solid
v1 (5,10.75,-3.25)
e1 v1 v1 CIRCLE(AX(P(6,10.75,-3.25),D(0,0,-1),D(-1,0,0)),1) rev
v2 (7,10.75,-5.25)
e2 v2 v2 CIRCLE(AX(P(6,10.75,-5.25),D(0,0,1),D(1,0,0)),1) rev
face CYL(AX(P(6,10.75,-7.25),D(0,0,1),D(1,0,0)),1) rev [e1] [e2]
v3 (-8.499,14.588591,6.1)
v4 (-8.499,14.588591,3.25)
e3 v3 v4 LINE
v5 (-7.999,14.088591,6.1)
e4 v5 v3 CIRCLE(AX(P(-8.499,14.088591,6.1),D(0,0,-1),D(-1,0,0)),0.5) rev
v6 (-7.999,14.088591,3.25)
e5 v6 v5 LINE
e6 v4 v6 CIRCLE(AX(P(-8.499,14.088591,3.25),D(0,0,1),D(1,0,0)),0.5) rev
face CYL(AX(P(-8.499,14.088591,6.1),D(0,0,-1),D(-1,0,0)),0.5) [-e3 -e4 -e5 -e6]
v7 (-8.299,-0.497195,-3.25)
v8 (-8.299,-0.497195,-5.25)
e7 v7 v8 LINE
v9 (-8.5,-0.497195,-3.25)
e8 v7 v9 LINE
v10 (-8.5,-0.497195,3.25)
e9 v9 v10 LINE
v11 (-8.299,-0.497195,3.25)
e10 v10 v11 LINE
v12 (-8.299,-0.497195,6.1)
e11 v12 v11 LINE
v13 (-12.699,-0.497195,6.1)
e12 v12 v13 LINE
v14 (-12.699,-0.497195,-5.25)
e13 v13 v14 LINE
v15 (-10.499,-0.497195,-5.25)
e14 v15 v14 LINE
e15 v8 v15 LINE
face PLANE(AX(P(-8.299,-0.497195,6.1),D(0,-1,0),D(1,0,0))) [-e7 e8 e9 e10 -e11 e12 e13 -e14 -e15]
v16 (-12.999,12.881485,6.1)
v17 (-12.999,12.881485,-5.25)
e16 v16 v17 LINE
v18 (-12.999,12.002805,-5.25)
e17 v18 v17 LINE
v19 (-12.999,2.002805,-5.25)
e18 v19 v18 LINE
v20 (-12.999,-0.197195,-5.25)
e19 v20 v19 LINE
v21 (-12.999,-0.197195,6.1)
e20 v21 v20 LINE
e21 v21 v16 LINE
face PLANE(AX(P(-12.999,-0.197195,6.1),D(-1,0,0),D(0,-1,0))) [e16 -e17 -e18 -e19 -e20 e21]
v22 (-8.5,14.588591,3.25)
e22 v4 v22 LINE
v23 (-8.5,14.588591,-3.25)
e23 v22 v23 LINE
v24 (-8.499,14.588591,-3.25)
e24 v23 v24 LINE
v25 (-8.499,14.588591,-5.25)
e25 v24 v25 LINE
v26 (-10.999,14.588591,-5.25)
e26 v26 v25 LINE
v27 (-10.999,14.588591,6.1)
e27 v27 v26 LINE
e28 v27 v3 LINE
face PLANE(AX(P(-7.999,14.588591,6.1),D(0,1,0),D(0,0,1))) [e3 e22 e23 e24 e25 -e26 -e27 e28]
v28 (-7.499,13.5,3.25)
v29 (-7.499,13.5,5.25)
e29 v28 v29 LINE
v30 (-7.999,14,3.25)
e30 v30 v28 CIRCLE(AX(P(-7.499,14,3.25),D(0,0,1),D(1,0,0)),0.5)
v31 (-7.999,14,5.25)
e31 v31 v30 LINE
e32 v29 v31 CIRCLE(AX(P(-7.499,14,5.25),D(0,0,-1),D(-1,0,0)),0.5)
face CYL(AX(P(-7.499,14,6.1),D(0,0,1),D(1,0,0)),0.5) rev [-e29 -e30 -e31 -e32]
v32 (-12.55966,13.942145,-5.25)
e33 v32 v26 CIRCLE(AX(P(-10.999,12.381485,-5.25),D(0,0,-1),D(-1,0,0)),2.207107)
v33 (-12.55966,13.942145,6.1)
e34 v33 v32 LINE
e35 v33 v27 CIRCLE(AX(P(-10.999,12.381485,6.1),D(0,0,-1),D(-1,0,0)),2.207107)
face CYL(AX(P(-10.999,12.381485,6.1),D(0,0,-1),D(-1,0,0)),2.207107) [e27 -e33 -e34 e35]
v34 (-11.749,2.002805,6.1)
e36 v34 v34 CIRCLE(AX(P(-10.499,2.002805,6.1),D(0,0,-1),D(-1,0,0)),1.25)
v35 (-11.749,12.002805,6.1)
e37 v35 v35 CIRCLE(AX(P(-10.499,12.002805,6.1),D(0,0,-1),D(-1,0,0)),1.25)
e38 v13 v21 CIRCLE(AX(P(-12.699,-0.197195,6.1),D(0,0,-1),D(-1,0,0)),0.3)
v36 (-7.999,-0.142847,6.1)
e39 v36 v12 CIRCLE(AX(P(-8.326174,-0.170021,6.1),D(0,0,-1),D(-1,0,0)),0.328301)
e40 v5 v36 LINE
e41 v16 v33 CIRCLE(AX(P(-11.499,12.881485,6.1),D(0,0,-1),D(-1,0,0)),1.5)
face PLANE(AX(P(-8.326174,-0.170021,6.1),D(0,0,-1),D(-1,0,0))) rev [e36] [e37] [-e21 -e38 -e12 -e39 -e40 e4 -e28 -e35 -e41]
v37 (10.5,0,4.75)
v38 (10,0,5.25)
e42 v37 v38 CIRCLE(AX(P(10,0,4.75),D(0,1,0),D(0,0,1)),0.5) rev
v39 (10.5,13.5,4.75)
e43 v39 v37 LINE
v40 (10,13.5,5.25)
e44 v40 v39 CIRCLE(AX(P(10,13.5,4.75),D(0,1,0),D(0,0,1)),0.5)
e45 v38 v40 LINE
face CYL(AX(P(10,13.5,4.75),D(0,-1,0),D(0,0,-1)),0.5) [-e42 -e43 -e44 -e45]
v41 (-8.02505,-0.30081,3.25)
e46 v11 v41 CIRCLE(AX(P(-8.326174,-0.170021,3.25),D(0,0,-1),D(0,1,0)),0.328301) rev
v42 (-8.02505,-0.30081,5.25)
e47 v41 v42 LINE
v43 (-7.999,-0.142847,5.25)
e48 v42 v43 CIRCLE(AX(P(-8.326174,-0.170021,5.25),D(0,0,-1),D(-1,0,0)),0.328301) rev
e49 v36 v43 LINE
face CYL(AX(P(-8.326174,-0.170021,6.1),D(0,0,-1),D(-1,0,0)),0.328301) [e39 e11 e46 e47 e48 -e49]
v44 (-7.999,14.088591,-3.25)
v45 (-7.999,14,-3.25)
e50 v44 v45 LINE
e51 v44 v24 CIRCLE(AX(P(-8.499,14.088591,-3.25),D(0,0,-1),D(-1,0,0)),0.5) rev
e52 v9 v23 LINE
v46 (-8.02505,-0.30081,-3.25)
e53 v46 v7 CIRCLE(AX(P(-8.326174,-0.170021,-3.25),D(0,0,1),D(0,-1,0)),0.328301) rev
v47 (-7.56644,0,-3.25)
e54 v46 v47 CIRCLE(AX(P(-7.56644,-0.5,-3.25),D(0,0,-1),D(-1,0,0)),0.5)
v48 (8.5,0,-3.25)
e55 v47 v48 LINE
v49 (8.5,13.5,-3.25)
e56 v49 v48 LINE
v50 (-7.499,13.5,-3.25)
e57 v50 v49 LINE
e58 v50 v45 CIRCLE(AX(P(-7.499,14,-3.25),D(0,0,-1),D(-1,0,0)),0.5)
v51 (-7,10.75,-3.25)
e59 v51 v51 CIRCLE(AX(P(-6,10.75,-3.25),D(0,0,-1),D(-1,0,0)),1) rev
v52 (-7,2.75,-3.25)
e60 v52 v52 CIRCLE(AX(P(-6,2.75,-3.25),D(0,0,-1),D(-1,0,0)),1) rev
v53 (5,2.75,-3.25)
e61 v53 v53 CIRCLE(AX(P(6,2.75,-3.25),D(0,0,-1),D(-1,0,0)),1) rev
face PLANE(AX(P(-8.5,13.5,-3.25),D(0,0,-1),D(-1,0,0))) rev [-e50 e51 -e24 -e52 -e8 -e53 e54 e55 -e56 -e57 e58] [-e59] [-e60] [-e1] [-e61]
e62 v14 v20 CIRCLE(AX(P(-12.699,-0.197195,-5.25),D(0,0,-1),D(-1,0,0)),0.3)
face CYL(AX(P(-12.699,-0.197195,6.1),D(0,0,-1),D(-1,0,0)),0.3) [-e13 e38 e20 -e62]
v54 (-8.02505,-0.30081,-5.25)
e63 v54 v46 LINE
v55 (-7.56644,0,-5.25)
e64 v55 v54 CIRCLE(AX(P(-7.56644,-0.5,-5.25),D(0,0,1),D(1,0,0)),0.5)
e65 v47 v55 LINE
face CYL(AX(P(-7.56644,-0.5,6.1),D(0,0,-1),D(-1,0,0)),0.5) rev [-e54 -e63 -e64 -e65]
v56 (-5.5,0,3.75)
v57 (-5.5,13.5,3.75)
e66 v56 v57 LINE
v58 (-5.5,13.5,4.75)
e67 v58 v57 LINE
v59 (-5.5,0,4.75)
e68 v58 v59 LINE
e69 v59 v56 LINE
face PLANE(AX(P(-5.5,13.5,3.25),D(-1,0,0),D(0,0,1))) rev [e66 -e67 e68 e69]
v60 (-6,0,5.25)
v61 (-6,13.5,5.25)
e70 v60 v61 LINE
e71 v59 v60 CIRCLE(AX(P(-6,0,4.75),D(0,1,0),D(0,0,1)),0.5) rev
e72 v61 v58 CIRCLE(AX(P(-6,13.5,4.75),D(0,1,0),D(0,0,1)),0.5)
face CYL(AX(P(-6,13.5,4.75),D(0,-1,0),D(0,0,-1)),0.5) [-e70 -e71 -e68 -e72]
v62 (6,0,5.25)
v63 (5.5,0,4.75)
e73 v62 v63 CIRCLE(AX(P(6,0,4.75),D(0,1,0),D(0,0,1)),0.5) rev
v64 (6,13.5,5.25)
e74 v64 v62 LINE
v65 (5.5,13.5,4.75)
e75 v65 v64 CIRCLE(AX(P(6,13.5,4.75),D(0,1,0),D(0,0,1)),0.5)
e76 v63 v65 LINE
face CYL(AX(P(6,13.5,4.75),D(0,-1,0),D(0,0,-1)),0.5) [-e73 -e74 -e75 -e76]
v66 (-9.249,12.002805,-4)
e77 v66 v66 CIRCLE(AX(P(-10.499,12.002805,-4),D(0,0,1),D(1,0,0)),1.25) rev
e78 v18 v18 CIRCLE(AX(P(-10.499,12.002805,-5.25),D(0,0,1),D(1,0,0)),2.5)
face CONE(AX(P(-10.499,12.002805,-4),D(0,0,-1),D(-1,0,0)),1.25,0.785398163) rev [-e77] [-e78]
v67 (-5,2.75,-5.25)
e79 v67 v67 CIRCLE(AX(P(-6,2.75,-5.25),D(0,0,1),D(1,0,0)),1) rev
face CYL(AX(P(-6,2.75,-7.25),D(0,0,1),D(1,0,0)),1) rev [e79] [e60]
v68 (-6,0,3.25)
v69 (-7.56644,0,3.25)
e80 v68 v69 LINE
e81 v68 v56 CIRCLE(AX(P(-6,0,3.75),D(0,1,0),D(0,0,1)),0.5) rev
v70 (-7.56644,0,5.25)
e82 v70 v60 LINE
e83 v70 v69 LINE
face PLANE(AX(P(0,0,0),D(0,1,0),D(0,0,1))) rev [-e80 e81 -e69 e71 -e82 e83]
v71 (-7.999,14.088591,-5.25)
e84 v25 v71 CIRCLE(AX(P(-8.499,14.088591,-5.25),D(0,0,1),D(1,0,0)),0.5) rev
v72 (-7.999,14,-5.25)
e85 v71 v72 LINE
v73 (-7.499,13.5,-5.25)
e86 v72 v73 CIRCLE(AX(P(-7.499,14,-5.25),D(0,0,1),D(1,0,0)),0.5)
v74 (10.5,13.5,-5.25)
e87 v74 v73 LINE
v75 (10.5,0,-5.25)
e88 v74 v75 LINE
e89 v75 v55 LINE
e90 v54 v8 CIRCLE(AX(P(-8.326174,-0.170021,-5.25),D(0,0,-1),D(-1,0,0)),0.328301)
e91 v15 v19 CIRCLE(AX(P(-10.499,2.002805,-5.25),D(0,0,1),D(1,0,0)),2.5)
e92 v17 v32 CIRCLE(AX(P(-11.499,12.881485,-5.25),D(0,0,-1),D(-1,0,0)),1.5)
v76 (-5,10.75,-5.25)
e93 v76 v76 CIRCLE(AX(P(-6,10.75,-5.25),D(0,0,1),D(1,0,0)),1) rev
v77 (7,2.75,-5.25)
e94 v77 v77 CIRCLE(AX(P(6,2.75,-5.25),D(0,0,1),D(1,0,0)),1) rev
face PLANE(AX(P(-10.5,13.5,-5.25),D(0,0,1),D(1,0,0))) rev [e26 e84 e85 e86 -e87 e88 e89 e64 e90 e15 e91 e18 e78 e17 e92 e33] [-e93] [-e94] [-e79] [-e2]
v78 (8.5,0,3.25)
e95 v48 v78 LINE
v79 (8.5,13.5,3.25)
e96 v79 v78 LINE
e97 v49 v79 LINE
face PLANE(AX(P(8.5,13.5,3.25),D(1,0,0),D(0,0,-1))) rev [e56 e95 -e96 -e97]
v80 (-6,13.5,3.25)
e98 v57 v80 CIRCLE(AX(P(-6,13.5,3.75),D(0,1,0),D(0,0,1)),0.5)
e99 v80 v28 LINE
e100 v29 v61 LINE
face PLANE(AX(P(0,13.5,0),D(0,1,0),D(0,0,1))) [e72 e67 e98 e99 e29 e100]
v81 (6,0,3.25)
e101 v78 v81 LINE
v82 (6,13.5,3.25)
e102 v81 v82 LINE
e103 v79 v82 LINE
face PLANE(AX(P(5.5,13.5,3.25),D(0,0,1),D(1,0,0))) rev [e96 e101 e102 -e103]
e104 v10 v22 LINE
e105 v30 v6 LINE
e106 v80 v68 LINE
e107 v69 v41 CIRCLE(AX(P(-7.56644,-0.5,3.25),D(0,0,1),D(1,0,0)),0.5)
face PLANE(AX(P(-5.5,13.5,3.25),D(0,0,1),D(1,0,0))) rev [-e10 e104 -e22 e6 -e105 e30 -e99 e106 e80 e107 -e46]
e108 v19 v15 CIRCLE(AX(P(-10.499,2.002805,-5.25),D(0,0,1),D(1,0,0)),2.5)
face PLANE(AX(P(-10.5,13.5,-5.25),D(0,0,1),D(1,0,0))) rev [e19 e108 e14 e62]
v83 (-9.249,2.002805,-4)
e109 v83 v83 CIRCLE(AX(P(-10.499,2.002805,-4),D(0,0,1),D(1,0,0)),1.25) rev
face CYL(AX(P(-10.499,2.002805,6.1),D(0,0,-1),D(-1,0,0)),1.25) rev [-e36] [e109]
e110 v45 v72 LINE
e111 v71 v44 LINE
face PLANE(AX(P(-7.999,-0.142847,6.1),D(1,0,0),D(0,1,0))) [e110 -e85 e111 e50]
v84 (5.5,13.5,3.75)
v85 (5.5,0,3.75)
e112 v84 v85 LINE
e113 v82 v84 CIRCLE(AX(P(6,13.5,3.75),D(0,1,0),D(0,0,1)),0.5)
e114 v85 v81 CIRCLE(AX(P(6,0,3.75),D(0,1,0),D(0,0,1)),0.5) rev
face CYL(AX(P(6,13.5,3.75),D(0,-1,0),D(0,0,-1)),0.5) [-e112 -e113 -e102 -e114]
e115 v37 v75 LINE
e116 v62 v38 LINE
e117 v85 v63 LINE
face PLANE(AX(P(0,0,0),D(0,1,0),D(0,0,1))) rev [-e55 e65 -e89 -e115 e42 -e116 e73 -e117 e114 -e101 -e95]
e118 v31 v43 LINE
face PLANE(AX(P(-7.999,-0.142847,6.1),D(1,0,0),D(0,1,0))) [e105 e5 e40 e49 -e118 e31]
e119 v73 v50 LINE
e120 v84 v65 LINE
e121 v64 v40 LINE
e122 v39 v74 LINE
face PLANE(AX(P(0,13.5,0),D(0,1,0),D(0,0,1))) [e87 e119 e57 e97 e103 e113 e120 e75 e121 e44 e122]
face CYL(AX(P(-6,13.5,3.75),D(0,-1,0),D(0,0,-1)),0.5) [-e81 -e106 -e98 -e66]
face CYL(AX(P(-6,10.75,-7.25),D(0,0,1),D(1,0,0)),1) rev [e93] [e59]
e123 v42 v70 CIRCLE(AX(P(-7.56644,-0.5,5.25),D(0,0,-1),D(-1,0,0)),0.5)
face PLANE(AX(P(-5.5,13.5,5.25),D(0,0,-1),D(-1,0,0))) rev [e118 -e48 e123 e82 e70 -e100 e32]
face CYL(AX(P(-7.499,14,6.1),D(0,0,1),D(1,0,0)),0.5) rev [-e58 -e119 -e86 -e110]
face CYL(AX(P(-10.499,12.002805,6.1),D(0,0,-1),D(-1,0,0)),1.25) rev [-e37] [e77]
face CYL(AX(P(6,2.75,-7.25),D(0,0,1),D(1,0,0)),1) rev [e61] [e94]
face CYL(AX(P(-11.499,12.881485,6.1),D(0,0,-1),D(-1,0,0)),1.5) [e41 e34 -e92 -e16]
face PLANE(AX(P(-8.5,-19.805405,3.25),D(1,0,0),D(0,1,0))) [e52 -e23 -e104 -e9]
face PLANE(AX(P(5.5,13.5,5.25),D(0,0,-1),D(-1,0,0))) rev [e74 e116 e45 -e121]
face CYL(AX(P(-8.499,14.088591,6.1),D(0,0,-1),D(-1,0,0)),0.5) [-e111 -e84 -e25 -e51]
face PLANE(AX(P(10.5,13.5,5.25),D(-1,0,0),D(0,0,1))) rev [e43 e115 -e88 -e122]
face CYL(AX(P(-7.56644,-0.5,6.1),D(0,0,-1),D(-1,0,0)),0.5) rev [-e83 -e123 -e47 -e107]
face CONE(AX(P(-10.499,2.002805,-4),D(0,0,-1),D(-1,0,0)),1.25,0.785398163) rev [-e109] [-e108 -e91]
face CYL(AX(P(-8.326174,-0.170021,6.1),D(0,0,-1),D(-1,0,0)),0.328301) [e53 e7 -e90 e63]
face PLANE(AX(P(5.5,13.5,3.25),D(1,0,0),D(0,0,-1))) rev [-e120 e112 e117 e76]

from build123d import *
from OCP.BRepAlgoAPI import BRepAlgoAPI_Cut
from OCP.TopTools import TopTools_ListOfShape

# Parameters (mm, degrees)
EXTRUDE_1_DEPTH          = 13.5
FILLET_1_R               = 0.5
CUT_EXTRUDE_1_DEPTH      = 2
CUT_EXTRUDE_1_DEPTH_BACK = 3.5
SKETCH_2_R               = 1
EXTRUDE_3_DEPTH          = 11.35
CUT_EXTRUDE_START        = -15.085786
SKETCH_14_W              = 17
SKETCH_14_H              = 6.5
CUT_EXTRUDE_7_DEPTH      = 15.085786
CUT_EXTRUDE_8_DEPTH      = 2
CUT_EXTRUDE_8_DEPTH_BACK = 15.5
SKETCH_15_R              = 1.150968548
SKETCH_15_R_2            = 1.118586154
FILLET_2_R               = 0.5
FILLET_START             = -5.25
FILLET_3_DEPTH           = 12.25
FILLET_START_2           = 3.25
FILLET_3_2_DEPTH         = 2
SKETCH_16_R              = 1.25
CUT_EXTRUDE_9_DEPTH      = 23.596980066
CHAMFER_2_SIZE           = 1.25


with BuildPart() as part:
    # 草图1 → 凸台-拉伸1 (new body)
    with BuildSketch(Plane(origin=(0, 0, 0), x_dir=(1, 0, 0), z_dir=(0, 1, 0))):
        Polygon((-5.5, -3.25), (-5.5, -5.25), (-10.5, -5.25), (-10.5, 5.25), (10.5, 5.25), (10.5, -5.25), (5.5, -5.25), (5.5, -3.25), (8.5, -3.25), (8.5, 3.25), (-8.5, 3.25), (-8.5, -3.25), align=None)
    extrude(amount=EXTRUDE_1_DEPTH)

    # 圆角1
    fillet_1_edges = [part.edges().sort_by_distance(p)[0] for p in [
        (-5.5, 6.75, 3.25),
        (-5.5, 6.75, 5.25),
        (-10.5, 6.75, 5.25),
        (10.5, 6.75, 5.25),
        (5.5, 6.75, 5.25),
        (5.5, 6.75, 3.25),
    ]]
    fillet(fillet_1_edges, radius=FILLET_1_R)

    # 草图2 → 切除-拉伸1 (cut, two sides: drawn at the far end of the back side and taken through both)
    with BuildSketch(Plane(origin=(0, 0, -5.25), x_dir=(-1, 0, 0), z_dir=(0, 0, -1)).offset(-CUT_EXTRUDE_1_DEPTH_BACK)):
        with Locations(Location((-6, 10.75, 0), (0, 0, 180))):
            Circle(SKETCH_2_R)
        with Locations(Location((6, 10.75, 0), (0, 0, 180))):
            Circle(SKETCH_2_R)
        with Locations(Location((6, 2.75, 0), (0, 0, 180))):
            Circle(SKETCH_2_R)
        with Locations(Location((-6, 2.75, 0), (0, 0, 180))):
            Circle(SKETCH_2_R)
    extrude(amount=CUT_EXTRUDE_1_DEPTH + CUT_EXTRUDE_1_DEPTH_BACK, mode=Mode.SUBTRACT)

    # 草图13 → 凸台-拉伸3 (add)
    with BuildSketch(Plane(origin=(0, 0, -5.25), x_dir=(-1, 0, 0), z_dir=(0, 0, -1))):
        with BuildLine():
            Line((7.999, -0.142846655), (7.999, 14.588591487))
            Line((7.999, 14.588591487), (10.999, 14.588591487))
            ThreePointArc((10.999, 14.588591487), (11.843623199, 14.420585487), (12.559660172, 13.942144877))
            ThreePointArc((12.559660172, 13.942144877), (12.884819299, 13.455509854), (12.999, 12.881484706))
            Line((12.999, 12.881484706), (12.999, -0.197194951))
            ThreePointArc((12.999, -0.197194951), (12.911132034, -0.409326985), (12.699, -0.497194951))
            Line((12.699, -0.497194951), (8.299, -0.497194951))
            ThreePointArc((8.299, -0.497194951), (8.075612065, -0.382152837), (7.999, -0.142846655))
        make_face()
    extrude(amount=-EXTRUDE_3_DEPTH)


with BuildPart() as cut_extrude_7_tool:
    # 草图14 → 切除-拉伸7 (new body)
    with BuildSketch(Plane.XZ.offset(0.497194951).offset(CUT_EXTRUDE_START)):
        Rectangle(SKETCH_14_W, SKETCH_14_H)
    extrude(amount=CUT_EXTRUDE_7_DEPTH)


with BuildPart() as part_1:
    add(part.part)

    # 切除-拉伸7: cut by cut_extrude_7_tool, with a tolerance
    cut_extrude_7_stock = TopTools_ListOfShape()
    cut_extrude_7_stock.Append(part_1.part.wrapped)
    cut_extrude_7_tools = TopTools_ListOfShape()
    cut_extrude_7_tools.Append(cut_extrude_7_tool.part.wrapped)
    cut_extrude_7_cut = BRepAlgoAPI_Cut()
    cut_extrude_7_cut.SetArguments(cut_extrude_7_stock)
    cut_extrude_7_cut.SetTools(cut_extrude_7_tools)
    cut_extrude_7_cut.SetFuzzyValue(0.00001)
    cut_extrude_7_cut.Build()
    add(Compound.cast(cut_extrude_7_cut.Shape()).solids(), mode=Mode.REPLACE)

    # 草图15 → 切除-拉伸8 (cut, two sides: drawn at the far end of the back side and taken through both)
    with BuildSketch(Plane.XY.offset(6.1).offset(-CUT_EXTRUDE_8_DEPTH_BACK)):
        with Locations(Location((-10.499, 12.002805049, 0), (0, 0, 180))):
            Circle(SKETCH_15_R)
        with Locations(Location((-10.499, 2.002805049, 0), (0, 0, 180))):
            Circle(SKETCH_15_R_2)
    extrude(amount=CUT_EXTRUDE_8_DEPTH + CUT_EXTRUDE_8_DEPTH_BACK, mode=Mode.SUBTRACT)

    # 圆角2
    fillet_2_edges = [part_1.edges().sort_by_distance(p)[0] for p in [
        (-7.999, 14.588591487, -4.25),
        (-7.999, 13.5, -4.25),
        (-7.999, 0, -4.25),
    ]]
    fillet(fillet_2_edges, radius=FILLET_2_R)

    # 圆角3: read off the stored shape, not the designer's step
    # 圆角3 outline → 圆角3 (cut)
    with BuildSketch(Plane.XY.offset(FILLET_START)):
        with BuildLine():
            Line((-7.999, 14.588591487), (-8.499, 14.588591487))
            ThreePointArc((-8.499, 14.588591487), (-8.14544661, 14.442144878), (-7.999, 14.088591487))
            Line((-7.999, 14.088591487), (-7.999, 14.588591487))
        make_face()
    extrude(amount=FILLET_3_DEPTH, mode=Mode.SUBTRACT)

    # Fillet 3 2 outline → Fillet 3 2 (add)
    with BuildSketch(Plane.XY.offset(FILLET_START_2)):
        with BuildLine():
            Line((-7.566440116, 0), (-7.999, 0))
            Line((-7.999, 0), (-7.999, -0.142846655))
            ThreePointArc((-7.999, -0.142846655), (-8.00224868, -0.223440354), (-8.025050148, -0.300809542))
            ThreePointArc((-8.025050148, -0.300809542), (-7.840670649, -0.081911954), (-7.566440116, 0))
        make_face()
        with BuildLine():
            ThreePointArc((-7.499, 13.5), (-7.852553391, 13.646446609), (-7.999, 14))
            Line((-7.999, 14), (-7.999, 13.5))
            Line((-7.999, 13.5), (-7.499, 13.5))
        make_face()
    extrude(amount=FILLET_3_2_DEPTH)

    # 草图16 → 切除-拉伸9 (cut, through all)
    with BuildSketch(Plane(origin=(0, 0, -5.25), x_dir=(-1, 0, 0), z_dir=(0, 0, -1))):
        with Locations((10.499, 12.002805049)):
            Circle(SKETCH_16_R)
        with Locations((10.499, 2.002805049)):
            Circle(SKETCH_16_R)
    extrude(amount=-CUT_EXTRUDE_9_DEPTH, mode=Mode.SUBTRACT)

    # 倒角2
    chamfer_2_edges = [part_1.edges().sort_by_distance(p)[0] for p in [
        (-9.249, 12.002805049, -5.25),
        (-9.249, 2.002805049, -5.25),
    ]]
    chamfer(chamfer_2_edges, length=CHAMFER_2_SIZE - 0.0001)  # a hair under: the kernel refuses the full size


solid = part_1.part
